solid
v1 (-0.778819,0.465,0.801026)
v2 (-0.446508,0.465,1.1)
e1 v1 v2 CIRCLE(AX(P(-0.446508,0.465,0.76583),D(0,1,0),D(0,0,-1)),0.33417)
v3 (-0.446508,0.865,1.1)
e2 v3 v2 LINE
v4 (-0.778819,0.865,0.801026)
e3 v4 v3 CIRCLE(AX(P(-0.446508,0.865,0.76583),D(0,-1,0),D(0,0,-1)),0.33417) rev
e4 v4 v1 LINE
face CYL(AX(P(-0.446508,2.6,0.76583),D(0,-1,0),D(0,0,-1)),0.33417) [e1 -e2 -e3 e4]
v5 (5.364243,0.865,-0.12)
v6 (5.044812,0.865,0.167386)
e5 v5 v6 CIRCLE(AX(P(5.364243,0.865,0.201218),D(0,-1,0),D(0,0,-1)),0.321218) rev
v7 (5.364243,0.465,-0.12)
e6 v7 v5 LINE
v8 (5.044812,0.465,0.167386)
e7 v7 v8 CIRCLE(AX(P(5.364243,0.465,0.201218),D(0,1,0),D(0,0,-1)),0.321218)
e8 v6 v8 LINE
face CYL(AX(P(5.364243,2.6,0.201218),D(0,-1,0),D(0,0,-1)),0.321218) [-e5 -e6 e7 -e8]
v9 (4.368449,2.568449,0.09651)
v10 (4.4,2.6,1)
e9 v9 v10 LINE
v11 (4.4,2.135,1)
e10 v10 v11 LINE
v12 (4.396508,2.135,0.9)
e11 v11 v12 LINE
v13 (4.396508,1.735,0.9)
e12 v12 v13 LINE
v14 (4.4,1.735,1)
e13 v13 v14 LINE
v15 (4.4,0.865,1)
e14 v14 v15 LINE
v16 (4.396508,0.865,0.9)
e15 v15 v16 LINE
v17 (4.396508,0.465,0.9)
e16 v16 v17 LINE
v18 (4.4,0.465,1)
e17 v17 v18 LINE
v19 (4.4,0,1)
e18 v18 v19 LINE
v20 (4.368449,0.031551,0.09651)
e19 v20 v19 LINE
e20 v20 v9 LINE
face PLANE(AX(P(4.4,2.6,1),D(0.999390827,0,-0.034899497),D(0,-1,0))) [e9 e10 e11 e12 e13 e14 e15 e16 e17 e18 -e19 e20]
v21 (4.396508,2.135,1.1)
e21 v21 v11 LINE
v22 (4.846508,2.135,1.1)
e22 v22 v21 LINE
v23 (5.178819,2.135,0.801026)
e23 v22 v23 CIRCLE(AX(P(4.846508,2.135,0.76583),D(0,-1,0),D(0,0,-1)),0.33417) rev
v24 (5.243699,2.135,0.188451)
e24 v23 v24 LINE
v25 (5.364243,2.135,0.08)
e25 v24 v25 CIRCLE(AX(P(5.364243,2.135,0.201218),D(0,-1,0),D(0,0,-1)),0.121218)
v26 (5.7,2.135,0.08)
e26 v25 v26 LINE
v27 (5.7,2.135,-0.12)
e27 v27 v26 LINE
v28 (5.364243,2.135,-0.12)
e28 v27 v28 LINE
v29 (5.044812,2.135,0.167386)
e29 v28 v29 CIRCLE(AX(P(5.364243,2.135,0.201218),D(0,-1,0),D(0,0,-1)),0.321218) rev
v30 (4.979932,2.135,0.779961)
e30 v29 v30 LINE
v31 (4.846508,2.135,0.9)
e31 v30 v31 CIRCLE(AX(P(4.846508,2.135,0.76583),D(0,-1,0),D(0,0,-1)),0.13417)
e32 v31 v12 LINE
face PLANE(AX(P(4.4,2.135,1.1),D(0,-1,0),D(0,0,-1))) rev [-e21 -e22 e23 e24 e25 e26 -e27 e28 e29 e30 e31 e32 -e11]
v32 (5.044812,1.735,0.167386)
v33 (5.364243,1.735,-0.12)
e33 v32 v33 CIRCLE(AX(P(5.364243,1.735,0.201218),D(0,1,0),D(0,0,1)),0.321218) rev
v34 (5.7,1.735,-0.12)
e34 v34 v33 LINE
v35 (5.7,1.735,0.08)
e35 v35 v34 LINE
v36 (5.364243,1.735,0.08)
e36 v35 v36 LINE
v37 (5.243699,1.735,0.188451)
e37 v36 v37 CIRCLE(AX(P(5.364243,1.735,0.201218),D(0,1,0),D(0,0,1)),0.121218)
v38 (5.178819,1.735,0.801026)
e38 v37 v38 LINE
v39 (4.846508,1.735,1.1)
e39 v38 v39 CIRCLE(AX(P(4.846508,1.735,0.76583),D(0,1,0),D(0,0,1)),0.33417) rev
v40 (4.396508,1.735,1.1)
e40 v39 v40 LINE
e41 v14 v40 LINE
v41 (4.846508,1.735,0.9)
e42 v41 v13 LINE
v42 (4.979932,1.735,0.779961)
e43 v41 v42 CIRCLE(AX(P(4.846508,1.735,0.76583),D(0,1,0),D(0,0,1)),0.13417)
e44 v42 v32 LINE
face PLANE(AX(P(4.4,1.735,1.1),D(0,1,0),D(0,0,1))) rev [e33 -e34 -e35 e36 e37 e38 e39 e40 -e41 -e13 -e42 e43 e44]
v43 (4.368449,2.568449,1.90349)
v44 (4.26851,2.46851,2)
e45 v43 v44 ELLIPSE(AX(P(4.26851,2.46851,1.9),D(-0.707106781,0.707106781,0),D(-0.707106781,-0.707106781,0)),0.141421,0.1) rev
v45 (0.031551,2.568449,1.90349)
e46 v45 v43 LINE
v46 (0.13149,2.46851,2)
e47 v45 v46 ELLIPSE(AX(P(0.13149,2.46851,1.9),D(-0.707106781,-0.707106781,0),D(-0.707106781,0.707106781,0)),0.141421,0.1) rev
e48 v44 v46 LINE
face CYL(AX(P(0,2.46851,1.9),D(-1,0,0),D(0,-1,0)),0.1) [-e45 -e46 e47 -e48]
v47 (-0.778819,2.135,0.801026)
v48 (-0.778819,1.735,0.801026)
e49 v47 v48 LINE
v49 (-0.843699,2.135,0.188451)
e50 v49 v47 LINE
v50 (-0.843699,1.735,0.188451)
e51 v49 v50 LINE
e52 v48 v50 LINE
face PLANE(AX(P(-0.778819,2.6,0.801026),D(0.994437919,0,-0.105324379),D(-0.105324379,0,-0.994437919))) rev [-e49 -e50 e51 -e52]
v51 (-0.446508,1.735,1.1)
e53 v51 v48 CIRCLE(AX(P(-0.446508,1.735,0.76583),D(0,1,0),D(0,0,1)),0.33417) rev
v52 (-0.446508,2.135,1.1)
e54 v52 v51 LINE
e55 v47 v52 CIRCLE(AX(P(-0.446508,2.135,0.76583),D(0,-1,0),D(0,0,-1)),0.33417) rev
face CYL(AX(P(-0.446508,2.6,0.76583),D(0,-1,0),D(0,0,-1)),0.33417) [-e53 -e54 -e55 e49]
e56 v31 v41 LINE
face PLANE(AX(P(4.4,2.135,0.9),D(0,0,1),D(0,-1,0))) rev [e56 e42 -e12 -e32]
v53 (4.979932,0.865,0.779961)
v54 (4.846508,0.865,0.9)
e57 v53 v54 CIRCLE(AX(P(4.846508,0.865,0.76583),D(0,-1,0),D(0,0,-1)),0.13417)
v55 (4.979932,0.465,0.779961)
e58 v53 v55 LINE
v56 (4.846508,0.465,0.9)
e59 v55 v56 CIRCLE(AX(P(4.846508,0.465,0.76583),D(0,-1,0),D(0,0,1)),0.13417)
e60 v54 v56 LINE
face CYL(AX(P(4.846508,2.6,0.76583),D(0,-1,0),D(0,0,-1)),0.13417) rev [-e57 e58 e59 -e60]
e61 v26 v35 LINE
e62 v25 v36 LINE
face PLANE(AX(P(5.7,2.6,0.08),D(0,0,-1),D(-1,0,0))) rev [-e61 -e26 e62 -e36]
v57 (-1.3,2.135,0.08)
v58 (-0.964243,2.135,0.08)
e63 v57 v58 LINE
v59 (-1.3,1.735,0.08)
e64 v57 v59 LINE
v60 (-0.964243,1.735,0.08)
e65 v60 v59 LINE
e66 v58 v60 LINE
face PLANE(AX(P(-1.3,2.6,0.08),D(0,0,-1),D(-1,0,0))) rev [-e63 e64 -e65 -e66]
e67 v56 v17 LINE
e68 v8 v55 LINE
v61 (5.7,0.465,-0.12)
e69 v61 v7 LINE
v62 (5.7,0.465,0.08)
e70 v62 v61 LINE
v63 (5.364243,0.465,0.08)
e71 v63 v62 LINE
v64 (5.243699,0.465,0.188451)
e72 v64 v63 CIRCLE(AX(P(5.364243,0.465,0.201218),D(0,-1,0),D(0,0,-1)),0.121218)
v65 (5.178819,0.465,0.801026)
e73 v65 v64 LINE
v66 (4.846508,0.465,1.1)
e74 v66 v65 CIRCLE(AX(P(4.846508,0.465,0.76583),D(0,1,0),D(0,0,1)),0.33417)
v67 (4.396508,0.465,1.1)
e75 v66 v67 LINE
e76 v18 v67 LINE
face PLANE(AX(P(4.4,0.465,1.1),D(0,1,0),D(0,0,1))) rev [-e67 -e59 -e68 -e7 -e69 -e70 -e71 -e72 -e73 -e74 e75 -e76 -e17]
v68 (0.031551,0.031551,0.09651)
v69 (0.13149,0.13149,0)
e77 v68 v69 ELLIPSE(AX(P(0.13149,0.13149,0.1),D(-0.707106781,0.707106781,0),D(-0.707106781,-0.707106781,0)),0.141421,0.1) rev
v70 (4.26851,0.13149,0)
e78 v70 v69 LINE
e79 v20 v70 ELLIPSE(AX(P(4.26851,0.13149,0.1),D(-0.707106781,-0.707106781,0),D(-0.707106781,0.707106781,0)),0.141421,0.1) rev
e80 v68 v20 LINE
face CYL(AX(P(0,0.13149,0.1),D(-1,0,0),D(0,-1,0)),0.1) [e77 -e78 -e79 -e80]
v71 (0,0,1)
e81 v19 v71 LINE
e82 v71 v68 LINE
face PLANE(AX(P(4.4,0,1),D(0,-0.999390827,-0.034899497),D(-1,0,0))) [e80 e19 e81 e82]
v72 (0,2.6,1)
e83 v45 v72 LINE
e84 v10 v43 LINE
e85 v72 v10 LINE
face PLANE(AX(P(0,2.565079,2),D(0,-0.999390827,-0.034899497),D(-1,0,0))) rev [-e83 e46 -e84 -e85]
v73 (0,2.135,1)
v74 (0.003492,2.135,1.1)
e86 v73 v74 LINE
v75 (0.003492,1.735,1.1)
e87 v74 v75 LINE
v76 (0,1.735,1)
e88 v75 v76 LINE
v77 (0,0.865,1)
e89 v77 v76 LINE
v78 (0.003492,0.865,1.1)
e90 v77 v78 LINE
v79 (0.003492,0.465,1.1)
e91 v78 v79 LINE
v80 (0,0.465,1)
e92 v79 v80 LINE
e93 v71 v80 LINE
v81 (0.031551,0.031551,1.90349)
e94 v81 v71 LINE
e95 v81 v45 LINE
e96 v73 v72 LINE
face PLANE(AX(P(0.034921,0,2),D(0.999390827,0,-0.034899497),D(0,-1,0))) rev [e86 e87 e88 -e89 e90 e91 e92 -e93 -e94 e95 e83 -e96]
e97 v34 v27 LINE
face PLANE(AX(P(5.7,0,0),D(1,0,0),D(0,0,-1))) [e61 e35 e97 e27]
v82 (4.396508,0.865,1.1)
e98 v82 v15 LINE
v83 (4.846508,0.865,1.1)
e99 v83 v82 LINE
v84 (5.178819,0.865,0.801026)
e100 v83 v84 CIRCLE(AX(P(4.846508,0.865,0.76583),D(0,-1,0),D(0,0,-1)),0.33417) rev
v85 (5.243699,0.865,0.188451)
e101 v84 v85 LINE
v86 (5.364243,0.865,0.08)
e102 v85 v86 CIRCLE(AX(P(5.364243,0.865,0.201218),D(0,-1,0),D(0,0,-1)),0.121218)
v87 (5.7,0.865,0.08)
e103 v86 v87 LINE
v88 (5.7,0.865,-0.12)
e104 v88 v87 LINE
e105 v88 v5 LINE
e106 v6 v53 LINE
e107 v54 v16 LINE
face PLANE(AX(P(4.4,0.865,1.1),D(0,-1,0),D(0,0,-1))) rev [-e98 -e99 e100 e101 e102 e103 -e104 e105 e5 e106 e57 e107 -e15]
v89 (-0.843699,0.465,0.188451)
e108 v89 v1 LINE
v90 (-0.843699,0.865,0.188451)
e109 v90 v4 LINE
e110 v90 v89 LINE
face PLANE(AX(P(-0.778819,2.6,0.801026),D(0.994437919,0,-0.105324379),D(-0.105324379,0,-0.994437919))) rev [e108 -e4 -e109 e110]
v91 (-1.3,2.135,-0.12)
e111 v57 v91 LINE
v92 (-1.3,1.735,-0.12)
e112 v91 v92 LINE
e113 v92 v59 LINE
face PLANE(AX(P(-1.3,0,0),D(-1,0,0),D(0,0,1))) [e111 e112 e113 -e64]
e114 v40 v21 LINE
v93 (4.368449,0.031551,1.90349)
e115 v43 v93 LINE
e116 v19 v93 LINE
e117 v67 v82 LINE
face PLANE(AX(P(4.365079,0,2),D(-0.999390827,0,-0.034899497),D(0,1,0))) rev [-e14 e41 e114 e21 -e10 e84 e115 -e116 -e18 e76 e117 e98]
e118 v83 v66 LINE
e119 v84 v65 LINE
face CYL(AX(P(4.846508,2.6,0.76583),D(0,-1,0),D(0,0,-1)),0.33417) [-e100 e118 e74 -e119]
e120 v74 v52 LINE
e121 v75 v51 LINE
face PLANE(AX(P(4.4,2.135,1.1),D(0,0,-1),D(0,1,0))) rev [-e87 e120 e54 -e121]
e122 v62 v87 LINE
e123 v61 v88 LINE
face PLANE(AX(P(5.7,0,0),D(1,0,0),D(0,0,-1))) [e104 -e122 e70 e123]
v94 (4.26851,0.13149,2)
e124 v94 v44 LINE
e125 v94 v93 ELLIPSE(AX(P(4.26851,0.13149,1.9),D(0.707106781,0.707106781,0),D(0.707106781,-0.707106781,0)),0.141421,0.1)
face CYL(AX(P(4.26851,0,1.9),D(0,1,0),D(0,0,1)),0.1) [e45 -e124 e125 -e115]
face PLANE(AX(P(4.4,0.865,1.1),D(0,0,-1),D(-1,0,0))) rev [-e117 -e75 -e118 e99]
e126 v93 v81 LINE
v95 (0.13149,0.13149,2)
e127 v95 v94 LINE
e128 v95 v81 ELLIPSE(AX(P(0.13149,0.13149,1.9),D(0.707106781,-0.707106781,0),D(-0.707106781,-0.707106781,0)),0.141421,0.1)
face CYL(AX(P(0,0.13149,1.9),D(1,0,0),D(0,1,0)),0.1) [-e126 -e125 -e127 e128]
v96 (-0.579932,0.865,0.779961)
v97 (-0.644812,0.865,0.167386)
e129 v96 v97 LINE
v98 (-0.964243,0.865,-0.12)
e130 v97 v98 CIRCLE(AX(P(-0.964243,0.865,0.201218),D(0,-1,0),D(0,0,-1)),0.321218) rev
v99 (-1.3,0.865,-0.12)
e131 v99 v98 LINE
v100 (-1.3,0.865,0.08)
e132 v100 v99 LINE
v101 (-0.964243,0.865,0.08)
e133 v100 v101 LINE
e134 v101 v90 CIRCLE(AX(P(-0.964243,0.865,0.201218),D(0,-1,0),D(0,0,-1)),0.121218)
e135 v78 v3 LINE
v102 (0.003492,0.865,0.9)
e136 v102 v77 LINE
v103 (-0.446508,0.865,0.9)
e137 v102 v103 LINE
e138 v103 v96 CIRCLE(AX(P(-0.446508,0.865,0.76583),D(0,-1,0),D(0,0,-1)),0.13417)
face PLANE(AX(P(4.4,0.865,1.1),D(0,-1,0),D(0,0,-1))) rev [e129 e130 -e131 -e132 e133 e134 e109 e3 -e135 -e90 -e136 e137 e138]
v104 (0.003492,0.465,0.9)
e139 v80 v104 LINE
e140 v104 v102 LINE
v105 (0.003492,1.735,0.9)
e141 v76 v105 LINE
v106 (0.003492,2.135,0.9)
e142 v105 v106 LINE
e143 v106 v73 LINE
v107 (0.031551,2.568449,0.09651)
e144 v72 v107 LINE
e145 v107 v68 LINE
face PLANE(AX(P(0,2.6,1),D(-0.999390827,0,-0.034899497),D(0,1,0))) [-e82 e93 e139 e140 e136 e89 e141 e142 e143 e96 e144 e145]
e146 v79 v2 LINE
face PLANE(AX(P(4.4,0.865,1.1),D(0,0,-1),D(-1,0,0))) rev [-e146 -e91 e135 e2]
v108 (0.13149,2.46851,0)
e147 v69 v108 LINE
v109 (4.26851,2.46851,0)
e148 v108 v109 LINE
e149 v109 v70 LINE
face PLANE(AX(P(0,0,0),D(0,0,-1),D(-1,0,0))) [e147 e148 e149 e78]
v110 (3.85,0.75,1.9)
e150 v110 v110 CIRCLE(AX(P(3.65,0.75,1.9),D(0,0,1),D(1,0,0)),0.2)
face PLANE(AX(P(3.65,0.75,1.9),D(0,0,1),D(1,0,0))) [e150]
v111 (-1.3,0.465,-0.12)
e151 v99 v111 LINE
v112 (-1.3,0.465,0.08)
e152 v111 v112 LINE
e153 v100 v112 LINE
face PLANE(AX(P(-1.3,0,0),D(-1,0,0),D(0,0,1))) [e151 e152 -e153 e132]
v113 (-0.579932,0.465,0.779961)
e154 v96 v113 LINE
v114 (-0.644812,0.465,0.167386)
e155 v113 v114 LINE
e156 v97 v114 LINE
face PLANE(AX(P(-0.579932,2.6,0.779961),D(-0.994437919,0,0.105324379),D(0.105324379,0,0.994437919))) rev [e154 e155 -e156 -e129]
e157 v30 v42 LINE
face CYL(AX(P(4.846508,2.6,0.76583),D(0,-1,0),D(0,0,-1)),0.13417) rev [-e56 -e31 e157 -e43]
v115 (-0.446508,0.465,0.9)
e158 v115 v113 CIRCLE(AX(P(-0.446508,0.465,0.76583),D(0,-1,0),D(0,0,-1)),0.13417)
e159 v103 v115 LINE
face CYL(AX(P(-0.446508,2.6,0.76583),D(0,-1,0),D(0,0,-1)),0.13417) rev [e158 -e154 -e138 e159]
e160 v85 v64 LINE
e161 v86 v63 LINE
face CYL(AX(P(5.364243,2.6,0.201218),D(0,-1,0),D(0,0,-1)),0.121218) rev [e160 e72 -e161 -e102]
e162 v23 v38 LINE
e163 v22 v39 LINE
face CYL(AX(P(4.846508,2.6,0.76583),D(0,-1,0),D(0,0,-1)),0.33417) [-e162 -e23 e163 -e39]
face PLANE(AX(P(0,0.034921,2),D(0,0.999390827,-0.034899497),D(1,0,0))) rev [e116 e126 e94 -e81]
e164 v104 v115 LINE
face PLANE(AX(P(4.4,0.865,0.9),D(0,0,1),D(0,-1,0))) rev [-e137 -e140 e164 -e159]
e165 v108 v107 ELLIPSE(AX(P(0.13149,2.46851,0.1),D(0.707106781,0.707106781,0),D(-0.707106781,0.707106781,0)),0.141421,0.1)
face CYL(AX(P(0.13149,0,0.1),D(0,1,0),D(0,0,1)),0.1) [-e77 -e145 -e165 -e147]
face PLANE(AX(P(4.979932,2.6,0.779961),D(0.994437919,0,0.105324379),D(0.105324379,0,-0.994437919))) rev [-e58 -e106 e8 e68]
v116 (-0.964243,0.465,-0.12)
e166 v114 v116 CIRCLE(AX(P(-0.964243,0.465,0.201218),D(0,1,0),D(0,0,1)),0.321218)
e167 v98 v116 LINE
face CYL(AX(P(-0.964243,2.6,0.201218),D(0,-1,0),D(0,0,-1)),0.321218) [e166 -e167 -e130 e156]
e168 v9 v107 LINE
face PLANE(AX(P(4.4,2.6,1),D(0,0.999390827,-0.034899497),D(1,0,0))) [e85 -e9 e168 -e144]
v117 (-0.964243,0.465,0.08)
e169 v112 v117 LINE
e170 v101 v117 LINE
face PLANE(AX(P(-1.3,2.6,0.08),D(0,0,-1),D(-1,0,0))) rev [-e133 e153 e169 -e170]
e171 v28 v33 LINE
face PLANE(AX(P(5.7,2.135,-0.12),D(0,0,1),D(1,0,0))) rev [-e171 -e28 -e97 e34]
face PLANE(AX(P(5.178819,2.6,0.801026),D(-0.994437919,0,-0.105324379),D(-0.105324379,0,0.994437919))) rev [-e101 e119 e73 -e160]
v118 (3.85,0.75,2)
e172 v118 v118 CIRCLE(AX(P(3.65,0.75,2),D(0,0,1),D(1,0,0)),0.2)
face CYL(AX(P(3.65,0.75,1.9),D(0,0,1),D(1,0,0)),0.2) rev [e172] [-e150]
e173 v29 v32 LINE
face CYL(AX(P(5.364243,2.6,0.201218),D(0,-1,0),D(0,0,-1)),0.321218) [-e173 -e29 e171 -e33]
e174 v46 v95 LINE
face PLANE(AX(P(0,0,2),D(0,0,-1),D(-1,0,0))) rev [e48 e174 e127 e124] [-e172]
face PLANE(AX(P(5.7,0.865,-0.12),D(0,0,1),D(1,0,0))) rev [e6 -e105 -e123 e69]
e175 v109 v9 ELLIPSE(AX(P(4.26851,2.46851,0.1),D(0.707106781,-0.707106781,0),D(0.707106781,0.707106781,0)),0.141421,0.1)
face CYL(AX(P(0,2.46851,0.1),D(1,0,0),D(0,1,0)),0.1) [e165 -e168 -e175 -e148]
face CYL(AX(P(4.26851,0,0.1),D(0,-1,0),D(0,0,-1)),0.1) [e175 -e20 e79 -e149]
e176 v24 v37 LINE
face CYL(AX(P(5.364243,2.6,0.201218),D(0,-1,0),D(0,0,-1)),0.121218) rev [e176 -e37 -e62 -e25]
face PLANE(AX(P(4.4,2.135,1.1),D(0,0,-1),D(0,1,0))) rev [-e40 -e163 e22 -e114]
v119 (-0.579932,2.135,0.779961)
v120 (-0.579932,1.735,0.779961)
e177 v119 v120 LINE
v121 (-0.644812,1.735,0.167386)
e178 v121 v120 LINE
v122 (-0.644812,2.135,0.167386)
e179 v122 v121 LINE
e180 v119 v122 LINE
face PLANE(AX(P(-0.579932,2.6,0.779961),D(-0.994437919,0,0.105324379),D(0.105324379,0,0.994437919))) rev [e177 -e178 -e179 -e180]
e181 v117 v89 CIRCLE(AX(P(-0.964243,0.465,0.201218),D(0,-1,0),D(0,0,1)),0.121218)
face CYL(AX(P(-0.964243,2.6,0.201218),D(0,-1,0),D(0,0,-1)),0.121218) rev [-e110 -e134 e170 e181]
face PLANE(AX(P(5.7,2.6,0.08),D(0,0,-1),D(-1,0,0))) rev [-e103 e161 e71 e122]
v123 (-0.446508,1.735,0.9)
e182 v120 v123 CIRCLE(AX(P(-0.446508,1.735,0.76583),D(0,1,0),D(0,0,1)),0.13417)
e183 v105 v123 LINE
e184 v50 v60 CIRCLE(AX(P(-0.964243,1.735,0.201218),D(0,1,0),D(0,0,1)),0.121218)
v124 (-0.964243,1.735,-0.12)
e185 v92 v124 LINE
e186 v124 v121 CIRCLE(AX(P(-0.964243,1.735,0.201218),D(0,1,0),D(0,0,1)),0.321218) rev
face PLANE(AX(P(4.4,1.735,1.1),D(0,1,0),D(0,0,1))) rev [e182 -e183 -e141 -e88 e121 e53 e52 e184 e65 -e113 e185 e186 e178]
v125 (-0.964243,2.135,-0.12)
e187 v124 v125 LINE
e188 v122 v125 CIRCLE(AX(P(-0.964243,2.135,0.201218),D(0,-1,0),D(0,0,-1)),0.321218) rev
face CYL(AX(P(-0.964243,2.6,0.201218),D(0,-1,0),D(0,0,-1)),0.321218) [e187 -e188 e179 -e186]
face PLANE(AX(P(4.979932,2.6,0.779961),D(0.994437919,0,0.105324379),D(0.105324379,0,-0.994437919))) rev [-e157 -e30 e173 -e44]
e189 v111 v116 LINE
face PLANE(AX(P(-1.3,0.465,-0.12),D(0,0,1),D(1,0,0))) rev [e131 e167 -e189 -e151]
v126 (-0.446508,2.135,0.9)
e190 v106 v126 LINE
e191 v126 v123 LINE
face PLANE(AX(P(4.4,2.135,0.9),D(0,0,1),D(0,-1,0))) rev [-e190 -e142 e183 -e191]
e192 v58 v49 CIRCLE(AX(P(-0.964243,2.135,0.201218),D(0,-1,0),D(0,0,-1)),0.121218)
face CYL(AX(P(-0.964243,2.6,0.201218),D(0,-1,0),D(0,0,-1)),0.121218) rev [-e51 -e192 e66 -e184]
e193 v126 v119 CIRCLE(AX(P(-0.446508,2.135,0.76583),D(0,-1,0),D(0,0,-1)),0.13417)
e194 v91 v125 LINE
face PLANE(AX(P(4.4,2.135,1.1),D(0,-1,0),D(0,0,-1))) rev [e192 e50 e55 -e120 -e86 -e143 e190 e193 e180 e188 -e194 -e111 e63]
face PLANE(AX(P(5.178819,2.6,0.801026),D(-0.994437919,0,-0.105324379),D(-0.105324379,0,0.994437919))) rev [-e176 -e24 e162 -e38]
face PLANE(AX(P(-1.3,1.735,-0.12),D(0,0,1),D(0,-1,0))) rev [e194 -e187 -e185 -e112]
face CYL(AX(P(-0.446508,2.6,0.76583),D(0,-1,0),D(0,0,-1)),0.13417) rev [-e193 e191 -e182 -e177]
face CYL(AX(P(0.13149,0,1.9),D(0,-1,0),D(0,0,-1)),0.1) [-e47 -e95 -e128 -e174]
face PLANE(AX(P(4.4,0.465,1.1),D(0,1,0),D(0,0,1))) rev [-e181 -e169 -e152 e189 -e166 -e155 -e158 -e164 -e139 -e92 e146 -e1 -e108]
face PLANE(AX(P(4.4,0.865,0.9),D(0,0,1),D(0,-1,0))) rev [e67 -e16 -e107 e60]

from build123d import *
from OCP.BRepFilletAPI import BRepFilletAPI_MakeChamfer

# Parameters (mm, degrees)
ESQUISSE1_W             = 4.4
ESQUISSE1_H             = 2.6
BOSS_EXTRU_1_DEPTH      = 2
CHANFREIN1_SIZE         = 1
CHANFREIN1_SIZE2        = 0.034921
CHANFREIN2_SIZE         = 0.034921
CHANFREIN2_SIZE_2       = 1
ESQUISSE2_R             = 0.2
ENL_V_MAT_EXTRU_1_DEPTH = 0.1
ESQUISSE3_W             = 0.3
ESQUISSE3_H             = 0.3
ENL_V_MAT_EXTRU_2_DEPTH = 6.488169
BOSS_EXTRU_2_DEPTH      = 0.000834
BOSS_EXTRU_2_DEPTH_BACK = 4.399166
ESQUISSE4_W             = 0.2
ESQUISSE4_H             = 0.4
ESQUISSE5_W             = 1.22
ESQUISSE5_H             = 0.4
BOSS_EXTRU_3_DEPTH      = 1.3
BOSS_EXTRU_4_OUTLINE_W  = 1.22
BOSS_EXTRU_4_OUTLINE_H  = 0.4
BOSS_EXTRU_4_DEPTH      = 1.3
ENL_V_MAT_EXTRU_3_DEPTH = 7.406889
CONG_1_R                = 0.1
CONG_2_R                = 0.1


with BuildPart() as part:
    # Esquisse1 → Boss.-Extru.1 (new body)
    with BuildSketch(Plane.XY):
        with Locations((2.2, 1.3)):
            Rectangle(ESQUISSE1_W, ESQUISSE1_H)
    extrude(amount=BOSS_EXTRU_1_DEPTH)

    # Chanfrein1: one chamfer whose edges measure the first distance from different faces: ONE call of the kernel's chamfer builder (chamfer() names one face for all edges)
    chanfrein1_edges_1 = [part.edges().sort_by_distance(p)[0] for p in [
        (0, 1.3, 2),
    ]]
    chanfrein1_side_1 = [part.faces().sort_by_distance(p)[0] for p in [
        (0, 1.3, 1),
    ]]
    chanfrein1_edges_2 = [part.edges().sort_by_distance(p)[0] for p in [
        (2.2, 0, 2),
    ]]
    chanfrein1_side_2 = [part.faces().sort_by_distance(p)[0] for p in [
        (2.2, 0, 1),
    ]]
    chanfrein1_edges_3 = [part.edges().sort_by_distance(p)[0] for p in [
        (4.4, 1.3, 2),
    ]]
    chanfrein1_side_3 = [part.faces().sort_by_distance(p)[0] for p in [
        (4.4, 1.3, 1),
    ]]
    chanfrein1_edges_4 = [part.edges().sort_by_distance(p)[0] for p in [
        (2.2, 2.6, 2),
    ]]
    chanfrein1_side_4 = [part.faces().sort_by_distance(p)[0] for p in [
        (2.2, 2.6, 1),
    ]]
    chanfrein1 = BRepFilletAPI_MakeChamfer(part.part.solid().wrapped)
    for e in chanfrein1_edges_1:
        chanfrein1.Add(CHANFREIN1_SIZE, CHANFREIN1_SIZE2, e.wrapped, chanfrein1_side_1[0].wrapped)  # the first distance lies on this face
    for e in chanfrein1_edges_2:
        chanfrein1.Add(CHANFREIN1_SIZE, CHANFREIN1_SIZE2, e.wrapped, chanfrein1_side_2[0].wrapped)  # the first distance lies on this face
    for e in chanfrein1_edges_3:
        chanfrein1.Add(CHANFREIN1_SIZE, CHANFREIN1_SIZE2, e.wrapped, chanfrein1_side_3[0].wrapped)  # the first distance lies on this face
    for e in chanfrein1_edges_4:
        chanfrein1.Add(CHANFREIN1_SIZE, CHANFREIN1_SIZE2, e.wrapped, chanfrein1_side_4[0].wrapped)  # the first distance lies on this face
    add(Compound.cast(chanfrein1.Shape()), mode=Mode.REPLACE)

    # Chanfrein2
    chanfrein2_edges_1 = [part.edges().sort_by_distance(p)[0] for p in [
        (2.2, 0, 0),
    ]]
    chanfrein2_side_1 = [part.faces().sort_by_distance(p)[0] for p in [
        (2.2, 0.000698, 0),
    ]]
    chanfrein2_edges_2 = [part.edges().sort_by_distance(p)[0] for p in [
        (4.4, 1.3, 0),
    ]]
    chanfrein2_side_2 = [part.faces().sort_by_distance(p)[0] for p in [
        (4.4, 1.3, 0.000698),
    ]]
    chanfrein2_edges_3 = [part.edges().sort_by_distance(p)[0] for p in [
        (2.2, 2.6, 0),
    ]]
    chanfrein2_side_3 = [part.faces().sort_by_distance(p)[0] for p in [
        (2.2, 2.6, 0.000698),
    ]]
    chanfrein2_edges_4 = [part.edges().sort_by_distance(p)[0] for p in [
        (0, 1.3, 0),
    ]]
    chanfrein2_side_4 = [part.faces().sort_by_distance(p)[0] for p in [
        (0.000698, 1.3, 0),
    ]]
    chanfrein2 = BRepFilletAPI_MakeChamfer(part.part.solid().wrapped)
    for e in chanfrein2_edges_1:
        chanfrein2.Add(CHANFREIN2_SIZE - 0.0001, CHANFREIN2_SIZE_2 - 0.0001, e.wrapped, chanfrein2_side_1[0].wrapped)
    for e in chanfrein2_edges_2:
        chanfrein2.Add(CHANFREIN2_SIZE_2 - 0.0001, CHANFREIN2_SIZE - 0.0001, e.wrapped, chanfrein2_side_2[0].wrapped)
    for e in chanfrein2_edges_3:
        chanfrein2.Add(CHANFREIN2_SIZE_2 - 0.0001, CHANFREIN2_SIZE - 0.0001, e.wrapped, chanfrein2_side_3[0].wrapped)
    for e in chanfrein2_edges_4:
        chanfrein2.Add(CHANFREIN2_SIZE - 0.0001, CHANFREIN2_SIZE_2 - 0.0001, e.wrapped, chanfrein2_side_4[0].wrapped)
    add(Compound.cast(chanfrein2.Shape()), mode=Mode.REPLACE)  # a hair under: the kernel refuses the full size

    # Esquisse2 → Enlèv. mat.-Extru.1 (cut)
    with BuildSketch(Plane.XY.offset(2)):
        with Locations((3.65, 0.75)):
            Circle(ESQUISSE2_R)
    extrude(amount=-ENL_V_MAT_EXTRU_1_DEPTH, mode=Mode.SUBTRACT)

    # Esquisse3 → Enlèv. mat.-Extru.2 (cut, through all)
    with BuildSketch(Plane.XY.offset(2)):
        with Locations((4.549166, 1.921549)):
            Rectangle(ESQUISSE3_W, ESQUISSE3_H)
        with Locations((-0.149629, 1.921549)):
            Rectangle(ESQUISSE3_W, ESQUISSE3_H)
    extrude(amount=-ENL_V_MAT_EXTRU_2_DEPTH, mode=Mode.SUBTRACT)

    # Esquisse4 → Boss.-Extru.2 (add, two sides: drawn at the far end of the back side and taken through both)
    with BuildSketch(Plane(origin=(4.399166, 0, 0), x_dir=(0, 0, -1), z_dir=(1, 0, 0)).offset(-BOSS_EXTRU_2_DEPTH_BACK)):
        Polygon((-1.1, 2.135), (-1, 2.135), (-0.9, 2.135), (-0.9, 1.735), (-1.1, 1.735), align=None)
        with Locations((-1, 0.665)):
            Rectangle(ESQUISSE4_W, ESQUISSE4_H)
    extrude(amount=BOSS_EXTRU_2_DEPTH + BOSS_EXTRU_2_DEPTH_BACK)

    # Esquisse5 → Boss.-Extru.3 (add)
    with BuildSketch(Plane.ZY):
        with Locations((0.49, 0.665)):
            Rectangle(ESQUISSE5_W, ESQUISSE5_H)
        with Locations((0.49, 1.935)):
            Rectangle(ESQUISSE5_W, ESQUISSE5_H)
    extrude(amount=BOSS_EXTRU_3_DEPTH)

    # Boss.-Extru.4: read off the stored shape, not the designer's step
    # Boss.-Extru.4 outline → Boss.-Extru.4 (add)
    with BuildSketch(Plane(origin=(4.4, 0, 0), x_dir=(0, 0, -1), z_dir=(1, 0, 0))):
        with Locations((-0.49, 1.935)):
            Rectangle(BOSS_EXTRU_4_OUTLINE_W, BOSS_EXTRU_4_OUTLINE_H)
        with Locations((-0.49, 0.665)):
            Rectangle(BOSS_EXTRU_4_OUTLINE_W, BOSS_EXTRU_4_OUTLINE_H)
    extrude(amount=BOSS_EXTRU_4_DEPTH)

    # Esquisse7 → Enlèv. mat.-Extru.3 (cut, through all)
    with BuildSketch(Plane.XZ.offset(-0.465)):
        with BuildLine():
            Line((0, 0.9), (-0.446508, 0.9))
            ThreePointArc((-0.446508, 0.9), (-0.536245, 0.865574), (-0.579932, 0.779961))
            Line((-0.579932, 0.779961), (-0.644812, 0.167386))
            ThreePointArc((-0.644812, 0.167386), (-0.749402, -0.037579), (-0.964243, -0.12))
            Line((-0.964243, -0.12), (0, -0.12))
            Line((0, -0.12), (0, 0.9))
        make_face()
        with BuildLine():
            Line((-1.3, 0.08), (-0.964243, 0.08))
            ThreePointArc((-0.964243, 0.08), (-0.883169, 0.111103), (-0.843699, 0.188451))
            Line((-0.843699, 0.188451), (-0.778819, 0.801026))
            ThreePointArc((-0.778819, 0.801026), (-0.670012, 1.014256), (-0.446508, 1.1))
            Line((-0.446508, 1.1), (-1.3, 1.1))
            Line((-1.3, 1.1), (-1.3, 0.08))
        make_face()
        with BuildLine():
            Line((4.4, -0.12), (5.364243, -0.12))
            ThreePointArc((5.364243, -0.12), (5.149402, -0.037579), (5.044812, 0.167386))
            Line((5.044812, 0.167386), (4.979932, 0.779961))
            ThreePointArc((4.979932, 0.779961), (4.936245, 0.865574), (4.846508, 0.9))
            Line((4.846508, 0.9), (4.4, 0.9))
            Line((4.4, 0.9), (4.4, -0.12))
        make_face()
        with BuildLine():
            Line((5.7, 1.1), (4.846508, 1.1))
            ThreePointArc((4.846508, 1.1), (5.070012, 1.014256), (5.178819, 0.801026))
            Line((5.178819, 0.801026), (5.243699, 0.188451))
            ThreePointArc((5.243699, 0.188451), (5.283169, 0.111103), (5.364243, 0.08))
            Line((5.364243, 0.08), (5.7, 0.08))
            Line((5.7, 0.08), (5.7, 1.1))
        make_face()
    extrude(amount=-ENL_V_MAT_EXTRU_3_DEPTH, mode=Mode.SUBTRACT)

    # Congé1
    cong_1_edges = [part.edges().sort_by_distance(p)[0] for p in [
        (2.2, 2.565079, 2),
        (4.365079, 1.3, 2),
        (0.034921, 1.3, 2),
        (2.2, 0.034921, 2),
    ]]
    fillet(cong_1_edges, radius=CONG_1_R)

    # Congé2
    cong_2_edges = [part.edges().sort_by_distance(p)[0] for p in [
        (0.034821, 1.3, 0),
        (2.2, 2.565179, 0),
        (4.365179, 1.3, 0),
        (2.2, 0.034821, 0),
    ]]
    fillet(cong_2_edges, radius=CONG_2_R)


solid = part.part
